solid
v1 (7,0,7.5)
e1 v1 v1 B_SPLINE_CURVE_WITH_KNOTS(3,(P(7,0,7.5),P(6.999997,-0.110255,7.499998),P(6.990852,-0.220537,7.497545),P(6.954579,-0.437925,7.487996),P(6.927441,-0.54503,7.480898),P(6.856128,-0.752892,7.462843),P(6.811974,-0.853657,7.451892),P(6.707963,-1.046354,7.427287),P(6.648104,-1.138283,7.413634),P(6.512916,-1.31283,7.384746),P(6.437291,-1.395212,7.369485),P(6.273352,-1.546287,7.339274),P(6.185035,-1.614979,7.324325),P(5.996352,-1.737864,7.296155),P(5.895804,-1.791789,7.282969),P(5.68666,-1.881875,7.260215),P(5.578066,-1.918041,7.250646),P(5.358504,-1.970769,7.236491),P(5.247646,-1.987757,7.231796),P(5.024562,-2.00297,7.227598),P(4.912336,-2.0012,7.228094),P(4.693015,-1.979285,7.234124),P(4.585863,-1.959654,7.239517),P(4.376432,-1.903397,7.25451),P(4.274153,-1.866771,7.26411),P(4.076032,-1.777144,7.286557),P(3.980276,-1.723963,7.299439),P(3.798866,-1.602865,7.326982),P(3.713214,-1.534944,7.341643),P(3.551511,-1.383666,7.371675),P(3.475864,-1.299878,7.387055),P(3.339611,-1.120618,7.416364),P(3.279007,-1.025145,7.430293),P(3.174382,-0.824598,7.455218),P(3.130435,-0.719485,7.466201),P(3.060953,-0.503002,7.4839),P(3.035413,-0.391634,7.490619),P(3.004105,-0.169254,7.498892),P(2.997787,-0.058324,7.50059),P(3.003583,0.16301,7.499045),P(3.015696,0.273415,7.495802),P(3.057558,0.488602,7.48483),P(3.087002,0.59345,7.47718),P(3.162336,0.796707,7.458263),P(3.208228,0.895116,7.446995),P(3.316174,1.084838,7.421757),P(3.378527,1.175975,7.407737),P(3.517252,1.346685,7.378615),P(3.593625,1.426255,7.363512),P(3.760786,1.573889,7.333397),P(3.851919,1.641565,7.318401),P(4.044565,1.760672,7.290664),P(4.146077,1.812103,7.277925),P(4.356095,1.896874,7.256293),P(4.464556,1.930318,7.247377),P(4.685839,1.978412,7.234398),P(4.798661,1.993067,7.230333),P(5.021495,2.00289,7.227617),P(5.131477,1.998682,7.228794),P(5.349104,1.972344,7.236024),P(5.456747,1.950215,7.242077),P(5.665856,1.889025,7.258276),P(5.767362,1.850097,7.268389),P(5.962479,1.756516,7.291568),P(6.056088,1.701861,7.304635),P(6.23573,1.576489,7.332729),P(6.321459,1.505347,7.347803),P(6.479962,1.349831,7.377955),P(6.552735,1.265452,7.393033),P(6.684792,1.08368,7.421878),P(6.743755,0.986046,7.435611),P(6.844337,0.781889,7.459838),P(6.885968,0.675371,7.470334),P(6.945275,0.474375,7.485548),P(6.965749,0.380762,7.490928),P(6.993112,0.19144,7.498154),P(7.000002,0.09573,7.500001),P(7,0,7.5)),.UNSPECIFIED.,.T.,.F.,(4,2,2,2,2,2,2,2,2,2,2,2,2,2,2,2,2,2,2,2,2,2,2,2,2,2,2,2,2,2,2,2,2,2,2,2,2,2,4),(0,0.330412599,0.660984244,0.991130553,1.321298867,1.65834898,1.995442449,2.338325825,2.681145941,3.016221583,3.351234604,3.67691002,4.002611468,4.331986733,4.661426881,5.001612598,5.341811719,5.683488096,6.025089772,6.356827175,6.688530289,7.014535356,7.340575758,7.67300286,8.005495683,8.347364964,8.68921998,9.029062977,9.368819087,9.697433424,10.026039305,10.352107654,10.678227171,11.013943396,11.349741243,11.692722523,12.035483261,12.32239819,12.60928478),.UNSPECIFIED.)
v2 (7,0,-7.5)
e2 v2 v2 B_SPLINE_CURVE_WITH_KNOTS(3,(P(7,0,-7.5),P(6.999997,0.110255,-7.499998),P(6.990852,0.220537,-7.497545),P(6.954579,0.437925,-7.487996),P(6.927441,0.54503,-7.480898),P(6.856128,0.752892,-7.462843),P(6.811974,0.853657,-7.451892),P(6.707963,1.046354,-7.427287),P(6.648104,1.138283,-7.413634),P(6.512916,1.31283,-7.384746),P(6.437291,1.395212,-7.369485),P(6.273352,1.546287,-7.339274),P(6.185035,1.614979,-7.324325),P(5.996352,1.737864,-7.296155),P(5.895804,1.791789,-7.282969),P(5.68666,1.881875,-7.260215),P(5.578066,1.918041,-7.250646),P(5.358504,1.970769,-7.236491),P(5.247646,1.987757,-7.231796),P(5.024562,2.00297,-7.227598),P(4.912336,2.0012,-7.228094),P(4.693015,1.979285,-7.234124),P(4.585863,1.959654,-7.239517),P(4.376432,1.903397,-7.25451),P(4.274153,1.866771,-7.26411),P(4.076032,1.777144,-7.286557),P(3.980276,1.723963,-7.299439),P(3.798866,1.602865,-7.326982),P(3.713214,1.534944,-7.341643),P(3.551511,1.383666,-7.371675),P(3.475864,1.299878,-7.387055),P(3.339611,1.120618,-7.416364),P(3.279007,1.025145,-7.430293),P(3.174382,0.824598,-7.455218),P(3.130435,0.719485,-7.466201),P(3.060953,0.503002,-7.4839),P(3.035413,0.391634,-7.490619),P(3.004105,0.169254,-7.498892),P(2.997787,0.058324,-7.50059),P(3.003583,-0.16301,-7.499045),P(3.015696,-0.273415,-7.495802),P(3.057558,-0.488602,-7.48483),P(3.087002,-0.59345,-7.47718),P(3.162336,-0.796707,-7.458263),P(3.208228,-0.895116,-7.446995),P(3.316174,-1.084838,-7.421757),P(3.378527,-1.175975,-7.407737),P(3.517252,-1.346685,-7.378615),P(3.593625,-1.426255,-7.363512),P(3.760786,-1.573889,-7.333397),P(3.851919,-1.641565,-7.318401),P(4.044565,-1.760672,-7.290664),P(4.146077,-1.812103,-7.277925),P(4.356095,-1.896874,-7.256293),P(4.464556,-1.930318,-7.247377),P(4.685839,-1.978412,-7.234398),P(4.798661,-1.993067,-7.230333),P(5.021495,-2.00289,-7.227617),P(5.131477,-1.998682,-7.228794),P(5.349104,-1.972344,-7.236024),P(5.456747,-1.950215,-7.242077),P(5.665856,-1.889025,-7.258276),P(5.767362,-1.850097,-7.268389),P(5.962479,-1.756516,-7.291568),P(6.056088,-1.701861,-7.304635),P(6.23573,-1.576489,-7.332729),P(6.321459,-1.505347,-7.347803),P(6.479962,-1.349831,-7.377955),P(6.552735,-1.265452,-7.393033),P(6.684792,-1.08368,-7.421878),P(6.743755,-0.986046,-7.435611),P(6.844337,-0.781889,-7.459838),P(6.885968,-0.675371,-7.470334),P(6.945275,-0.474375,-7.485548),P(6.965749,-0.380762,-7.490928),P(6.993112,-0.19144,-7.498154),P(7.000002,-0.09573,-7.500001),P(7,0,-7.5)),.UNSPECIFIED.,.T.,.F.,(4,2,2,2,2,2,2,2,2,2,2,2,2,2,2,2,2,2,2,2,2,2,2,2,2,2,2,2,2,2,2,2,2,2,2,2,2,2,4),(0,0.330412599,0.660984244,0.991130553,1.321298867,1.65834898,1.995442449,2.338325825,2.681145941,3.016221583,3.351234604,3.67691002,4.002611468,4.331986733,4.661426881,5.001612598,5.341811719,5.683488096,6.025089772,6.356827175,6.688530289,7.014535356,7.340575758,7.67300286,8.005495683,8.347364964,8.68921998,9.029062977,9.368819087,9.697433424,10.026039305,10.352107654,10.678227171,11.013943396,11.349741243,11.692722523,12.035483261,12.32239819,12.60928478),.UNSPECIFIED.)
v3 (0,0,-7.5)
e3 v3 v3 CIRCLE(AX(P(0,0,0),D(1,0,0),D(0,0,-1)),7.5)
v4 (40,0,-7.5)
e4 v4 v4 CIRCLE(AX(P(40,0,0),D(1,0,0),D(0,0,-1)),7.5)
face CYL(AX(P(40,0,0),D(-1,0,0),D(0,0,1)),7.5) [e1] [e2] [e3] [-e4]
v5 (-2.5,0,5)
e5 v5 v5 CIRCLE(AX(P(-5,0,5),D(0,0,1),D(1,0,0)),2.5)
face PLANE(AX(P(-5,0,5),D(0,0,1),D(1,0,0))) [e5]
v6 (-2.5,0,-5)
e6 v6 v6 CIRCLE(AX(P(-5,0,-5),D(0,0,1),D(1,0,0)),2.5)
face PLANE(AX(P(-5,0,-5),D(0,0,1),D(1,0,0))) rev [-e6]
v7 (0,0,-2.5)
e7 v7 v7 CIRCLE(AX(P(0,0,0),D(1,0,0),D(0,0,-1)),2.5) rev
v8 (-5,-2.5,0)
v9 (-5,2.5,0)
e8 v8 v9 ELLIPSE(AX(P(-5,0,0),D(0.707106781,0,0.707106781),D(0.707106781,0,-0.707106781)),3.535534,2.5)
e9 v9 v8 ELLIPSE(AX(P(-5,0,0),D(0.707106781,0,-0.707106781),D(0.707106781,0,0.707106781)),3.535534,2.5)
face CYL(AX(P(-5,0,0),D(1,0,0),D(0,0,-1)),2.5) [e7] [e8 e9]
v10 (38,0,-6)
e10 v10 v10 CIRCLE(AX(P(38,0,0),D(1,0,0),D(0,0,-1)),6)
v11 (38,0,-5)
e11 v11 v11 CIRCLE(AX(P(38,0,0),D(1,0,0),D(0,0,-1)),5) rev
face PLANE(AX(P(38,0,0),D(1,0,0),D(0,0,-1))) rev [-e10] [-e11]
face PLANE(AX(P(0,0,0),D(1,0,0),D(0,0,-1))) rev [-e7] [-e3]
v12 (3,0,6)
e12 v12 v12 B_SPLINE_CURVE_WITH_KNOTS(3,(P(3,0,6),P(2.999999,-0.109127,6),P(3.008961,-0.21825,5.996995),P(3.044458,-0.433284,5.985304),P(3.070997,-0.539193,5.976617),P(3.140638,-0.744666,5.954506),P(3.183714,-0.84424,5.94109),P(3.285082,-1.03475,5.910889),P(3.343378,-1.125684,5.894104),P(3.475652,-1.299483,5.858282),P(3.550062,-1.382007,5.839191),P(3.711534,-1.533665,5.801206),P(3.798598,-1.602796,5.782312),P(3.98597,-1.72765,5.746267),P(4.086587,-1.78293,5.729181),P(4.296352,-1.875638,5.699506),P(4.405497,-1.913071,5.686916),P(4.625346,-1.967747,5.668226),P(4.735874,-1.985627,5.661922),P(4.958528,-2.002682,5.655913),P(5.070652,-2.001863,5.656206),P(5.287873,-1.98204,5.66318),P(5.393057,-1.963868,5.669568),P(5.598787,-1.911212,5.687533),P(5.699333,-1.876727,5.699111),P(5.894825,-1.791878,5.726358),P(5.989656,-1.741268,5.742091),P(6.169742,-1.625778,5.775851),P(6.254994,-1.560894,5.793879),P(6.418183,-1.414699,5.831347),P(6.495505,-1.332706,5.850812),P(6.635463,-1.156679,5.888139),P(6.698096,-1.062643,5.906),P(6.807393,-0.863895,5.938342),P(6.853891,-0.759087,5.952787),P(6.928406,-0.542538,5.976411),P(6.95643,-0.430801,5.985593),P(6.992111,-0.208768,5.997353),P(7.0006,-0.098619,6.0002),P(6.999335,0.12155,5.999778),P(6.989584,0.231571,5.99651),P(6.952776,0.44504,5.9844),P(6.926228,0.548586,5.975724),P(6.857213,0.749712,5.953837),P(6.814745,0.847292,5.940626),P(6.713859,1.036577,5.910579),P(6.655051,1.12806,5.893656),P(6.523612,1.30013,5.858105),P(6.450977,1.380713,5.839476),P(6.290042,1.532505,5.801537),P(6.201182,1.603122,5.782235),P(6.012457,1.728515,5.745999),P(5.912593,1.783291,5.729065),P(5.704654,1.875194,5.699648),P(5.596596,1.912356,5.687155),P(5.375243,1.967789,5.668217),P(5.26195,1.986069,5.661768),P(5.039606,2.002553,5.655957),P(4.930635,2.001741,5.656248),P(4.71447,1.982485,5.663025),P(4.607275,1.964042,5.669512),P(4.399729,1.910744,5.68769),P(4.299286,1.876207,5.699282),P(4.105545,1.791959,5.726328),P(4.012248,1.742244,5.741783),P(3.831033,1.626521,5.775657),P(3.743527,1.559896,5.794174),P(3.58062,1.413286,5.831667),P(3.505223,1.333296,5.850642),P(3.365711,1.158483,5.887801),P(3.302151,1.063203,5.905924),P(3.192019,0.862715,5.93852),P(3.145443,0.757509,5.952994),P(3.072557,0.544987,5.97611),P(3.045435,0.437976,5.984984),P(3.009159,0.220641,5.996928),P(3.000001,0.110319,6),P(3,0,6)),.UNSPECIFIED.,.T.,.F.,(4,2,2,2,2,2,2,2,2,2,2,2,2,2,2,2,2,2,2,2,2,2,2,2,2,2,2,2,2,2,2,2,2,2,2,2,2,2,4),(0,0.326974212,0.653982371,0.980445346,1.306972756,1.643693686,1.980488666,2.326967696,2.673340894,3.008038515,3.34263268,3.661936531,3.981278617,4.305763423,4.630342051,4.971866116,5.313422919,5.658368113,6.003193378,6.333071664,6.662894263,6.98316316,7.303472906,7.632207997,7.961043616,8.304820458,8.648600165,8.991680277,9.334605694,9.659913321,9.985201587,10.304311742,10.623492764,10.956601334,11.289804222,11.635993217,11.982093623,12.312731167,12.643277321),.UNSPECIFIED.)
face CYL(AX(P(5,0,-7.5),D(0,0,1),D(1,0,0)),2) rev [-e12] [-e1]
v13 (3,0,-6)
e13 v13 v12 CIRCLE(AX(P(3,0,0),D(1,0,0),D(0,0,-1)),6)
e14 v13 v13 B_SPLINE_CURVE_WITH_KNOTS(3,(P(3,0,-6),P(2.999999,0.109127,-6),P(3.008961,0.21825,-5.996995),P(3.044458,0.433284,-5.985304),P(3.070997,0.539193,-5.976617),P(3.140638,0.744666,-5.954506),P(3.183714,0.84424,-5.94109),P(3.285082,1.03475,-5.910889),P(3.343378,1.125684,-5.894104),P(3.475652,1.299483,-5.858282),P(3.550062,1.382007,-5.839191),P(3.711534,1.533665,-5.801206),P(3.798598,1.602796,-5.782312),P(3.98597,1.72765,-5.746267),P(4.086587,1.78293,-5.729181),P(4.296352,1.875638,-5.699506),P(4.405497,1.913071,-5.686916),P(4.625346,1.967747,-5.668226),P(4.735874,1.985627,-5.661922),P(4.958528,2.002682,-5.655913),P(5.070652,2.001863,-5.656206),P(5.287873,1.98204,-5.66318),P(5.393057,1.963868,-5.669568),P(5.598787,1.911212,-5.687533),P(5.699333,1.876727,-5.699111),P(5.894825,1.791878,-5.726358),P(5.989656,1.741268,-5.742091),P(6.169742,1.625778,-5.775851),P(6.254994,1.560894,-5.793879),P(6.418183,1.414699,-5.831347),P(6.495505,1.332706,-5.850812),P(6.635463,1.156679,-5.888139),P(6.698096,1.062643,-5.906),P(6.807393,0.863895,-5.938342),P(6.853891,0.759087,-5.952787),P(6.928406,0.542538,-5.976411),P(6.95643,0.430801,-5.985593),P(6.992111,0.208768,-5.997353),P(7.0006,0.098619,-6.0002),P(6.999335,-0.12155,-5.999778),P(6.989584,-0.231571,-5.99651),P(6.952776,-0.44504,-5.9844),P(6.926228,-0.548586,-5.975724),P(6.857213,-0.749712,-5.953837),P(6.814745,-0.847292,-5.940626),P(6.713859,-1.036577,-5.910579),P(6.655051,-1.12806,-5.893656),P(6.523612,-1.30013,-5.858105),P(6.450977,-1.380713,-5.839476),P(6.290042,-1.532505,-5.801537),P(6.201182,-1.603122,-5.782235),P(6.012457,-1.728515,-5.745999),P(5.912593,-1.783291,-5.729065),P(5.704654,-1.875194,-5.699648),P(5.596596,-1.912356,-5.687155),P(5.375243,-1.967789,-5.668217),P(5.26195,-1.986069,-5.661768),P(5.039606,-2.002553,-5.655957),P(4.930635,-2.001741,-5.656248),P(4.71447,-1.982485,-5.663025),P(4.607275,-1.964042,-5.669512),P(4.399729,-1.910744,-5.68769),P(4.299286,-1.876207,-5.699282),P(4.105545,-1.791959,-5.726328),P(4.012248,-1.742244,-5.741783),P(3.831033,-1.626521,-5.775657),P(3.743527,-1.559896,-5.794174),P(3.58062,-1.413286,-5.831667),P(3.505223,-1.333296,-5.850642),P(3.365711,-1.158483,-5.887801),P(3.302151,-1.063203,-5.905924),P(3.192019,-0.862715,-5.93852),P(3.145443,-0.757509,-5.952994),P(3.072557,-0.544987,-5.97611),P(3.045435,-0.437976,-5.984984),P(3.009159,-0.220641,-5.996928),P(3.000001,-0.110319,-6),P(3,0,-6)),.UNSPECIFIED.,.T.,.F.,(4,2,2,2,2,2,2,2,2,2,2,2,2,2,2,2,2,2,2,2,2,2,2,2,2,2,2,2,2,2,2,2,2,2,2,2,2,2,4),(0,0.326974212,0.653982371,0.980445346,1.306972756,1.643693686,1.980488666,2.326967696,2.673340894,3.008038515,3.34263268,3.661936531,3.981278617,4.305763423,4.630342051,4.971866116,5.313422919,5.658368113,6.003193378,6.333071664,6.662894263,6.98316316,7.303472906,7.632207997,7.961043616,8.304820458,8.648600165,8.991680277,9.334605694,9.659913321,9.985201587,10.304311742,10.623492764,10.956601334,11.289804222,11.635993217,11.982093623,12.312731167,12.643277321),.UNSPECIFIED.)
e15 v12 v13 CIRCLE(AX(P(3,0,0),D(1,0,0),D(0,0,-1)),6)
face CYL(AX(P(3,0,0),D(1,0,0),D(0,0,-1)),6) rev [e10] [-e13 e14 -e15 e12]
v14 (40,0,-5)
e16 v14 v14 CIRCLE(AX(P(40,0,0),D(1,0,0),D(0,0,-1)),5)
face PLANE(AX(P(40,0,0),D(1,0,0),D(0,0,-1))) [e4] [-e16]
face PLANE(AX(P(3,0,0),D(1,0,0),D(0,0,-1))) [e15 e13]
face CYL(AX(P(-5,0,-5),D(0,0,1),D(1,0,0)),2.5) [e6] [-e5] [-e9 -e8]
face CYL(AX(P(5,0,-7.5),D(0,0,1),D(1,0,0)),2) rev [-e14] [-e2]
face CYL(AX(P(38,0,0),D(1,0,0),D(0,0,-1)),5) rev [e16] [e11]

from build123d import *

# Parameters (mm, degrees)
SKETCH1_R                = 7.5
BOSS_EXTRUDE1_DEPTH      = 40
SKETCH2_R                = 5
CUT_EXTRUDE1_DEPTH       = 2
SKETCH3_R                = 6
CUT_EXTRUDE2_DEPTH       = 35
SKETCH4_R                = 2.5
BOSS_EXTRUDE4_DEPTH      = 5
BOSS_EXTRUDE5_DEPTH      = 5
BOSS_EXTRUDE5_DEPTH_BACK = 5
SKETCH6_R                = 2.5
F_3DSKETCH3_R            = 2
CUT_EXTRUDE3_DEPTH       = 39.810436741


with BuildPart() as part:
    # Sketch1 → Boss-Extrude1 (new body)
    with BuildSketch(Plane(origin=(0, 0, 0), x_dir=(0, 0, -1), z_dir=(1, 0, 0))):
        Circle(SKETCH1_R)
    extrude(amount=BOSS_EXTRUDE1_DEPTH)

    # Sketch2 → Cut-Extrude1 (cut)
    with BuildSketch(Plane(origin=(40, 0, 0), x_dir=(0, 0, -1), z_dir=(1, 0, 0))):
        Circle(SKETCH2_R)
    extrude(amount=-CUT_EXTRUDE1_DEPTH, mode=Mode.SUBTRACT)

    # Sketch3 → Cut-Extrude2 (cut)
    with BuildSketch(Plane(origin=(38, 0, 0), x_dir=(0, 0, -1), z_dir=(1, 0, 0))):
        Circle(SKETCH3_R)
    extrude(amount=-CUT_EXTRUDE2_DEPTH, mode=Mode.SUBTRACT)

    # Sketch4 → Boss-Extrude4 (add)
    with BuildSketch(Plane.ZY):
        Circle(SKETCH4_R)
    extrude(amount=BOSS_EXTRUDE4_DEPTH)

    # Sketch6 → Boss-Extrude5 (add, two sides: drawn at the far end of the back side and taken through both)
    with BuildSketch(Plane.XY.offset(-BOSS_EXTRUDE5_DEPTH_BACK)):
        with Locations((-5, 0)):
            Circle(SKETCH6_R)
    extrude(amount=BOSS_EXTRUDE5_DEPTH + BOSS_EXTRUDE5_DEPTH_BACK)

    # 3DSketch3 → Cut-Extrude3 (cut, through all)
    with BuildSketch(Plane(origin=(5, 0, -7.5), x_dir=(0, 1, 0), z_dir=(0, 0, -1))):
        Circle(F_3DSKETCH3_R)
    extrude(amount=-CUT_EXTRUDE3_DEPTH, mode=Mode.SUBTRACT)


solid = part.part
